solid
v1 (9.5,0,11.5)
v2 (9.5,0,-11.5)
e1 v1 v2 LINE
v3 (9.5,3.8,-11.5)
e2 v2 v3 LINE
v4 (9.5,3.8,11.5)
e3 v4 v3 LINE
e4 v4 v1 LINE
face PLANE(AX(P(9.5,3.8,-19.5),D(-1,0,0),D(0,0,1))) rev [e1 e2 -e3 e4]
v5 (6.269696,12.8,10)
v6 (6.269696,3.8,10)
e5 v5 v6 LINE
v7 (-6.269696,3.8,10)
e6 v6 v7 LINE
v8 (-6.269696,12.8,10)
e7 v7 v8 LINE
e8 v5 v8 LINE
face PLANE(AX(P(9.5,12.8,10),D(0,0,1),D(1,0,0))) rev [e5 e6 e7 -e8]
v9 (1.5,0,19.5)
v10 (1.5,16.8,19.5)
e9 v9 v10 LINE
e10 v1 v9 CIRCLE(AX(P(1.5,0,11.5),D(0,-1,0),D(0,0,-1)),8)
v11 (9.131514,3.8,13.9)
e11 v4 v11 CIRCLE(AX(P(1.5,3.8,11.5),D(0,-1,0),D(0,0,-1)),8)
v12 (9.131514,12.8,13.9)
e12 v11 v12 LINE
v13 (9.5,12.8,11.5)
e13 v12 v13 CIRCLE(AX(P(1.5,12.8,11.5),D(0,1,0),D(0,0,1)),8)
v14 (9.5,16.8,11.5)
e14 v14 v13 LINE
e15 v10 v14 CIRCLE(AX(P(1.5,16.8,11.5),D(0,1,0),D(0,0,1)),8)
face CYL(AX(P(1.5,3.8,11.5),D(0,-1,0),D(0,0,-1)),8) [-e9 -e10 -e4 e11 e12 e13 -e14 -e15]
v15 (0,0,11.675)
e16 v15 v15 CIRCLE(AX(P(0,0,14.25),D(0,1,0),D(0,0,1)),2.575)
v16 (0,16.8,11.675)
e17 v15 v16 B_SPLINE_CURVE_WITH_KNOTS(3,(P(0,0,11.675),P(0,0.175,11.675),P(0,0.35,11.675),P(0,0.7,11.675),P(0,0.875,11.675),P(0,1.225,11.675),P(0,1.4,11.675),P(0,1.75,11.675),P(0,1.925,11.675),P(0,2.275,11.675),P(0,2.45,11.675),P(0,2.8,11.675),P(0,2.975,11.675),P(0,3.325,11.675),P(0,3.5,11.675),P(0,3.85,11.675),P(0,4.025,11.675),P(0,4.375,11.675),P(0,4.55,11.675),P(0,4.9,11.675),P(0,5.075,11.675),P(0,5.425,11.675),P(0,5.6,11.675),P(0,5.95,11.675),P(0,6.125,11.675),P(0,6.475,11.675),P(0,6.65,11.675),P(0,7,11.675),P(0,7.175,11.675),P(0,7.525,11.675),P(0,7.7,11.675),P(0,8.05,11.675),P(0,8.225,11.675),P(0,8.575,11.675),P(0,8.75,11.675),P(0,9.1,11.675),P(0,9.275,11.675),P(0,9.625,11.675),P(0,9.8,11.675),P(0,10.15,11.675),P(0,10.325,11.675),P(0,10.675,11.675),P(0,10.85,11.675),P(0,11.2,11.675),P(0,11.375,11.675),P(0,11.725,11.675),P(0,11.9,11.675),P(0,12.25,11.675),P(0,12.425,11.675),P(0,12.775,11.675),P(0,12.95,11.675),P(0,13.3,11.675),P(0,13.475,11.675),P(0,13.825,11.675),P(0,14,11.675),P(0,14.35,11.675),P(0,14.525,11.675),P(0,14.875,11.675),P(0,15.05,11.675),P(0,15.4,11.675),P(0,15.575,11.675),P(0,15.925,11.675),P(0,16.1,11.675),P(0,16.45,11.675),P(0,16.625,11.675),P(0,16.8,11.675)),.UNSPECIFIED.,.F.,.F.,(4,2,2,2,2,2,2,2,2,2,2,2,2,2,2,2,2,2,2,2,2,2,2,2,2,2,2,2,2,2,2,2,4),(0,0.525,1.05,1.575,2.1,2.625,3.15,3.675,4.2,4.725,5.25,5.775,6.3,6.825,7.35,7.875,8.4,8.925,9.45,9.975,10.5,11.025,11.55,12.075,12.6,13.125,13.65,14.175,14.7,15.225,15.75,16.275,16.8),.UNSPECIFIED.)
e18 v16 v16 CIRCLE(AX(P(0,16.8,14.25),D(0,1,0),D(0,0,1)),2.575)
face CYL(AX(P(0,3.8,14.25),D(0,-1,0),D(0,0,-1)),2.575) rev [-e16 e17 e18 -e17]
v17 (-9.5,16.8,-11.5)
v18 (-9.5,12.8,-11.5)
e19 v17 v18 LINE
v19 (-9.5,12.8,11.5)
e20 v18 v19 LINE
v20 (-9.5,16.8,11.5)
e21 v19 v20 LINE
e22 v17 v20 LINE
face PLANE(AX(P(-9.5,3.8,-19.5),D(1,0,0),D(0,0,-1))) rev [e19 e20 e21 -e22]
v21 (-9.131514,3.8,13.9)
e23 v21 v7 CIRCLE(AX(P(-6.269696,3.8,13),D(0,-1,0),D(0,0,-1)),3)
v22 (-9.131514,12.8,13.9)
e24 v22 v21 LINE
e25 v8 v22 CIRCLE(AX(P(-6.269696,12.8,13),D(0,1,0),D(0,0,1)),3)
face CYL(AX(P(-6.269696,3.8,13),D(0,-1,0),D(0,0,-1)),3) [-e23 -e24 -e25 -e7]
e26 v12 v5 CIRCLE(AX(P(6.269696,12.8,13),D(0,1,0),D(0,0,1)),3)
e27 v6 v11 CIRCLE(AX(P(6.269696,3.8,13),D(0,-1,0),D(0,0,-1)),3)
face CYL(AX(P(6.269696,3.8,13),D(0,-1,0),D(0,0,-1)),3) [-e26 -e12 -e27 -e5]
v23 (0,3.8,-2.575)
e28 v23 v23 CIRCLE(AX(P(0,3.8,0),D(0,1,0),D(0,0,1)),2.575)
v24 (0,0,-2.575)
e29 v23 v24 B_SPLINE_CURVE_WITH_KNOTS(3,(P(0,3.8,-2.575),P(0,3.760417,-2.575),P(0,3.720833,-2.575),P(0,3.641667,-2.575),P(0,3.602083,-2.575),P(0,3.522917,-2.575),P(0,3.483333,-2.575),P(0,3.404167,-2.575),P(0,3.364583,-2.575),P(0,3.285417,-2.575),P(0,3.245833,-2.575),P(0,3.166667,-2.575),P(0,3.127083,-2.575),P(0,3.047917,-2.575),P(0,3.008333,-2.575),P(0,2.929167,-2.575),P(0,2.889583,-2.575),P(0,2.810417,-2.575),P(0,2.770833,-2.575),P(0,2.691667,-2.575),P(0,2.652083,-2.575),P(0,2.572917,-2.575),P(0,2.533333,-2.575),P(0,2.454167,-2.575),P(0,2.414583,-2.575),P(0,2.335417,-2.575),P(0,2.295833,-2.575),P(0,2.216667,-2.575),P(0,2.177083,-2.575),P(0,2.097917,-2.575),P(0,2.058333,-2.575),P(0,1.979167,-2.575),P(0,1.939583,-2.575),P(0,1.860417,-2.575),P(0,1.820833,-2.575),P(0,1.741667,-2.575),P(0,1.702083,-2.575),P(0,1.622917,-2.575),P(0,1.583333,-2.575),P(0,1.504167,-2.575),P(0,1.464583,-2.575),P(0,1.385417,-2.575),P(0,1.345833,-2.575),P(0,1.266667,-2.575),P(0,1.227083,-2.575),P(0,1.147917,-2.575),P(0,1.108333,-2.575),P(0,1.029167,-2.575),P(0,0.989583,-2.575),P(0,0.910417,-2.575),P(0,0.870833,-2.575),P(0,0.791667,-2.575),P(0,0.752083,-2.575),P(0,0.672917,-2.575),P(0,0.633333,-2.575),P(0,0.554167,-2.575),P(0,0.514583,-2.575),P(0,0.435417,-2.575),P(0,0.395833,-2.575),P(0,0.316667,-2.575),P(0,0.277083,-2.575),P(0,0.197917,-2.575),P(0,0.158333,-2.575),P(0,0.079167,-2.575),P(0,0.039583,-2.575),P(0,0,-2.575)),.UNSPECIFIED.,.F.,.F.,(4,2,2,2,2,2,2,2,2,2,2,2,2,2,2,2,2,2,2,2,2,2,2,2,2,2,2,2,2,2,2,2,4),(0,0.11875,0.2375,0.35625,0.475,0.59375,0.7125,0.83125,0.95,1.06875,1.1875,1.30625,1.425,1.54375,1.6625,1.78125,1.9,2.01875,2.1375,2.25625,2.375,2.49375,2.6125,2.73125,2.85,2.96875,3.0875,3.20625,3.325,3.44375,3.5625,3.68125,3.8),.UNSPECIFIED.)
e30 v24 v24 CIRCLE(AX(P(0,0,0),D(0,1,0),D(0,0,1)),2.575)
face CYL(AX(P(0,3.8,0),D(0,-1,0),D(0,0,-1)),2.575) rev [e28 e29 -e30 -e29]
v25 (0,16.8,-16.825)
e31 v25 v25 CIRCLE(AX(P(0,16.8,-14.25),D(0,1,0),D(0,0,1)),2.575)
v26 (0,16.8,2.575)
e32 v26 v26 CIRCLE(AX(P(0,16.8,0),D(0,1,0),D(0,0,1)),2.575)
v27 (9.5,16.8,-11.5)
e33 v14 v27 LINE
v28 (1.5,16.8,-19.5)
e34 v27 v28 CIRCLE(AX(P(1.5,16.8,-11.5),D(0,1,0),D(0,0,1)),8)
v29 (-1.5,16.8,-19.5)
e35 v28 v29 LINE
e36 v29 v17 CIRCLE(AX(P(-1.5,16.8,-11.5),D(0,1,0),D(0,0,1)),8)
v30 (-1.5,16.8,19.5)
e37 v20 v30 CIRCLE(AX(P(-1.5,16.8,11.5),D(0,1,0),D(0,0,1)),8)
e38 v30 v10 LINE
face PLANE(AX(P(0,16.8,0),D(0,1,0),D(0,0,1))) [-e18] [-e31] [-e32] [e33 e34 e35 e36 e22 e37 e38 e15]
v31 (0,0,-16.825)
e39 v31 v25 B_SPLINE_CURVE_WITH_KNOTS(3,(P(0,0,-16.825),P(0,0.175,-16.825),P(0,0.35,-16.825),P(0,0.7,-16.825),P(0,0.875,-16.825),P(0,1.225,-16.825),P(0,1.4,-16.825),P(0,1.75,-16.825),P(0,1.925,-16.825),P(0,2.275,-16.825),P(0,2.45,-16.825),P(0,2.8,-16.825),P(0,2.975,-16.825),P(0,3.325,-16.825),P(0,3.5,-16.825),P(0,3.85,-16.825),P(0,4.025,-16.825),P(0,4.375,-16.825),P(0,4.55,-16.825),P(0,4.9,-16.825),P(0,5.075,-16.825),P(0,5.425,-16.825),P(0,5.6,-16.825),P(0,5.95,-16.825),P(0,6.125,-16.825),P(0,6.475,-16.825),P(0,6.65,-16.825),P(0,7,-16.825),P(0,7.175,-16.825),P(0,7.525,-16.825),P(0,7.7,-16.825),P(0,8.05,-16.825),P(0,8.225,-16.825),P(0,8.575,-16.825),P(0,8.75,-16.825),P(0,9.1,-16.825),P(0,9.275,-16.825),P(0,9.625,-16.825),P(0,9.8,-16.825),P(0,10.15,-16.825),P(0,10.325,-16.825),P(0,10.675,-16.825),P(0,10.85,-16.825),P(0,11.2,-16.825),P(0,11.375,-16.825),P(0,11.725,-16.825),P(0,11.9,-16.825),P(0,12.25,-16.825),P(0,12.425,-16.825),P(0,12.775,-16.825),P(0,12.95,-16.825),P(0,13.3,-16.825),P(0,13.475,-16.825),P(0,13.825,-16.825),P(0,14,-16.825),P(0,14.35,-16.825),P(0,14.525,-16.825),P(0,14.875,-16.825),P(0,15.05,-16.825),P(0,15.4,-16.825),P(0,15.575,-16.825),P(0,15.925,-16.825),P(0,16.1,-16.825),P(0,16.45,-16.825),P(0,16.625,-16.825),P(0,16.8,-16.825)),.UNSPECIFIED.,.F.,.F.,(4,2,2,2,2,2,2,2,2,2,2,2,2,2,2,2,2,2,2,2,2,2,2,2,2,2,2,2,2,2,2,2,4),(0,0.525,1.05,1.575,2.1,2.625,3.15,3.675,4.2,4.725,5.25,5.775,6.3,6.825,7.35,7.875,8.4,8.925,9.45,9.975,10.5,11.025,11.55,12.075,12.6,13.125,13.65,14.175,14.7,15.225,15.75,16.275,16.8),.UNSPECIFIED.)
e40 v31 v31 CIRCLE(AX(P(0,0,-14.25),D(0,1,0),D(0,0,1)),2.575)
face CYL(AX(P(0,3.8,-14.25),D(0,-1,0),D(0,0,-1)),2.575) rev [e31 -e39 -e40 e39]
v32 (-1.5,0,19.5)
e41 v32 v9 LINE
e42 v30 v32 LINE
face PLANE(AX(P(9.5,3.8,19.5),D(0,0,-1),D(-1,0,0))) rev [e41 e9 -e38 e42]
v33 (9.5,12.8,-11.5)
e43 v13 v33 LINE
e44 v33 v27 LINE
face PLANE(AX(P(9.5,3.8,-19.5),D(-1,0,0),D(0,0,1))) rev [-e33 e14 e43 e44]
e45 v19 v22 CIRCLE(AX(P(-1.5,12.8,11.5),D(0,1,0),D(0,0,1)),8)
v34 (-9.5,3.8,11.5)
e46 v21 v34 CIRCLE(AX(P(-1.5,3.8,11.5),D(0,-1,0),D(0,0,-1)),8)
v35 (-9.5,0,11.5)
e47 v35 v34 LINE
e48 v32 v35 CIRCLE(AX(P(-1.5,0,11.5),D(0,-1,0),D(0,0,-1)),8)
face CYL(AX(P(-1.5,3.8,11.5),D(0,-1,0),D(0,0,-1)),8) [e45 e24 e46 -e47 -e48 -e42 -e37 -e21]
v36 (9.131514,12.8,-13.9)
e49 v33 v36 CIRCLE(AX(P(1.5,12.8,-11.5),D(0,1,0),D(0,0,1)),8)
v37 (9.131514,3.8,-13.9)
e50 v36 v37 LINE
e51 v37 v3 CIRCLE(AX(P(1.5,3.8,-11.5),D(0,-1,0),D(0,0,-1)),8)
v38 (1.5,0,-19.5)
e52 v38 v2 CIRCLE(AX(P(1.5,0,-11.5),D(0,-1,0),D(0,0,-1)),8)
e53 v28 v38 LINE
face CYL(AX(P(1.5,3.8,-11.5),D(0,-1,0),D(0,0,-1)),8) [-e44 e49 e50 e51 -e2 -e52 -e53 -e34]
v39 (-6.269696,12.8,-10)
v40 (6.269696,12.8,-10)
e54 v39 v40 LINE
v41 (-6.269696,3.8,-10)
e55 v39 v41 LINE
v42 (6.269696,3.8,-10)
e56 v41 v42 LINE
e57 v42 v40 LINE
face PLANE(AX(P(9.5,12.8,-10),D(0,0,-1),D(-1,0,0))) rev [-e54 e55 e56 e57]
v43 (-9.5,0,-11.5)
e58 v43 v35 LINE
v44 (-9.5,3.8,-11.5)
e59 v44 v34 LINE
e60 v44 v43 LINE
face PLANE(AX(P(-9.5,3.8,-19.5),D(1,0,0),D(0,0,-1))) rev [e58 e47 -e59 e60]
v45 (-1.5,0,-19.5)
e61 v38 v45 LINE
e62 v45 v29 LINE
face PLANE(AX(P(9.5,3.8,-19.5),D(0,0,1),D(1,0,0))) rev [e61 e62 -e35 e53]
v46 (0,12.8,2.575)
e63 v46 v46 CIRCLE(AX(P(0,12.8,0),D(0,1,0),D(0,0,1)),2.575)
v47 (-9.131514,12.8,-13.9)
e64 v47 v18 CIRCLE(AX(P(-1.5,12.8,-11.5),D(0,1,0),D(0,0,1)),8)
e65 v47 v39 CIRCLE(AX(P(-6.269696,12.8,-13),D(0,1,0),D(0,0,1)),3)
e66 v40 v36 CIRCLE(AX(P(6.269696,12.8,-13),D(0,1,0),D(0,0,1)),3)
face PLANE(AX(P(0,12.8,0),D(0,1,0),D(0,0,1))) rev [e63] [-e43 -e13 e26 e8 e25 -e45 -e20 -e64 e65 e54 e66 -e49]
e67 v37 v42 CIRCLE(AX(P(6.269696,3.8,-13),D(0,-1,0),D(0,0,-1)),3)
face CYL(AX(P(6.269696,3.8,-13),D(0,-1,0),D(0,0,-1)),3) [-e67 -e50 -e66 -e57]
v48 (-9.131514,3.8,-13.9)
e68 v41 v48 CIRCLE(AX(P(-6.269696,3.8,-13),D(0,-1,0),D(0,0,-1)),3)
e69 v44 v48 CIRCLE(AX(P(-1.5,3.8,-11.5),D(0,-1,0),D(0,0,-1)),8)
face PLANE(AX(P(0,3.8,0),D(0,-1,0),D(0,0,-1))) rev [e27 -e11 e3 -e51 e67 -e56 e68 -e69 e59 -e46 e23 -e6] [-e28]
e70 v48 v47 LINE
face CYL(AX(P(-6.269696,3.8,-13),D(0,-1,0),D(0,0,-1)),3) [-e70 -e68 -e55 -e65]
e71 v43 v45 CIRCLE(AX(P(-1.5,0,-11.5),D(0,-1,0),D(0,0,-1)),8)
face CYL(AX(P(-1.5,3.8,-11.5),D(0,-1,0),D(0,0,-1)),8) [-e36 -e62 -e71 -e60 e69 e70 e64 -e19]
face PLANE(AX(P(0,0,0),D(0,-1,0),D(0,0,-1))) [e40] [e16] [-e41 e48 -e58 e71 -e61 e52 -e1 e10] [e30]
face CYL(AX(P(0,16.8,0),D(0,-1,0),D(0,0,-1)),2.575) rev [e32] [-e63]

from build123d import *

# Parameters (mm, degrees)
SKETCH1_W           = 19
SKETCH1_H           = 39
SKETCH1_R           = 2.575
BOSS_EXTRUDE1_DEPTH = 3.8
SKETCH2_W           = 19
SKETCH2_H           = 9.5
SKETCH2_R           = 2.575
BOSS_EXTRUDE2_DEPTH = 9
SKETCH3_W           = 19
SKETCH3_H           = 39
SKETCH3_R           = 2.575
BOSS_EXTRUDE3_DEPTH = 4
FILLET1_R           = 8
FILLET2_R           = 3


with BuildPart() as part:
    # Sketch1 → Boss-Extrude1 (new body)
    with BuildSketch(Plane(origin=(0, 0, 0), x_dir=(-1, 0, 0), z_dir=(0, 1, 0))):
        Rectangle(SKETCH1_W, SKETCH1_H)
        with Locations(Location((0, 0, 0), (0, 0, 270))):
            Circle(SKETCH1_R, mode=Mode.SUBTRACT)
        with Locations(Location((0, 14.25, 0), (0, 0, 270))):
            Circle(SKETCH1_R, mode=Mode.SUBTRACT)
        with Locations(Location((0, -14.25, 0), (0, 0, 270))):
            Circle(SKETCH1_R, mode=Mode.SUBTRACT)
    extrude(amount=BOSS_EXTRUDE1_DEPTH)

    # Sketch2 → Boss-Extrude2 (add)
    # profile 1 of 2: a face of its own
    with BuildSketch(Plane(origin=(0, 3.8, 0), x_dir=(-1, 0, 0), z_dir=(0, 1, 0))):
        with Locations((0, 14.75)):
            Rectangle(SKETCH2_W, SKETCH2_H)
        with Locations(Location((0, 14.25, 0), (0, 0, 270))):
            Circle(SKETCH2_R, mode=Mode.SUBTRACT)
    # profile 2 of 2: a face of its own
    with BuildSketch(Plane(origin=(0, 3.8, 0), x_dir=(-1, 0, 0), z_dir=(0, 1, 0))):
        with Locations((0, -14.75)):
            Rectangle(SKETCH2_W, SKETCH2_H)
        with Locations(Location((0, -14.25, 0), (0, 0, 270))):
            Circle(SKETCH2_R, mode=Mode.SUBTRACT)
    extrude(amount=BOSS_EXTRUDE2_DEPTH)

    # Sketch3 → Boss-Extrude3 (add)
    with BuildSketch(Plane(origin=(0, 12.8, 0), x_dir=(-1, 0, 0), z_dir=(0, 1, 0))):
        Rectangle(SKETCH3_W, SKETCH3_H)
        with Locations(Location((0, 14.25, 0), (0, 0, 270))):
            Circle(SKETCH3_R, mode=Mode.SUBTRACT)
        with Locations(Location((0, 0, 0), (0, 0, 270))):
            Circle(SKETCH3_R, mode=Mode.SUBTRACT)
        with Locations(Location((0, -14.25, 0), (0, 0, 270))):
            Circle(SKETCH3_R, mode=Mode.SUBTRACT)
    extrude(amount=BOSS_EXTRUDE3_DEPTH)

    # Fillet1
    fillet1_edges = [part.edges().sort_by_distance(p)[0] for p in [
        (-9.5, 8.4, -19.5),
        (9.5, 8.4, -19.5),
        (9.5, 8.4, 19.5),
        (-9.5, 8.4, 19.5),
    ]]
    fillet(fillet1_edges, radius=FILLET1_R)

    # Fillet2
    # the kernel refuses this fillet: 3 mm, written as the material it takes off along each edge
    with BuildSketch(Plane(origin=(9.5, 3.8, 10), x_dir=(-0.09406475637410622, 0, 0.9955660809852251), z_dir=(0, 1, 0)), Plane(origin=(-9.5, 3.8, -10), x_dir=(0.09406475637410011, 0, -0.9955660809852258), z_dir=(0, 1, 0))) as fillet2_piece_1:
        with BuildLine():
            CenterArc((3.290556001, -2.933786817), FILLET2_R, 77.939890127, 107.457603124)
            Line((0.303857758, -3.215981087), (0.005187934, -3.244200514))
            Line((0.005187934, -3.244200514), (-0.298669824, -0.028219427))
            Line((-0.298669824, -0.028219427), (-0.028219427, 0.298669824))
            ThreePointArc((-0.028219427, 0.298669824), (1.465129695, 0.439766959), (3.980050628, 0.293378682))
            Line((3.980050628, 0.293378682), (3.917369298, 0))
        make_face()
    extrude(amount=9, mode=Mode.SUBTRACT)
    with BuildSketch(Plane(origin=(-9.5, 3.8, 10), x_dir=(0.09406475637410577, 0, 0.9955660809852253), z_dir=(0, 1, 0)), Plane(origin=(9.5, 3.8, -10), x_dir=(-0.09406475637410053, 0, -0.9955660809852258), z_dir=(0, 1, 0))) as fillet2_piece_2:
        with BuildLine():
            CenterArc((3.290556001, 2.933786817), FILLET2_R, 174.602506749, 107.457603124)
            Line((0.303857758, 3.215981087), (0.005187934, 3.244200514))
            Line((0.005187934, 3.244200514), (-0.298669824, 0.028219427))
            Line((-0.298669824, 0.028219427), (-0.028219427, -0.298669824))
            ThreePointArc((-0.028219427, -0.298669824), (1.465129695, -0.439766959), (3.980050628, -0.293378682))
            Line((3.980050628, -0.293378682), (3.917369298, 0))
        make_face()
    extrude(amount=9, mode=Mode.SUBTRACT)


solid = part.part
